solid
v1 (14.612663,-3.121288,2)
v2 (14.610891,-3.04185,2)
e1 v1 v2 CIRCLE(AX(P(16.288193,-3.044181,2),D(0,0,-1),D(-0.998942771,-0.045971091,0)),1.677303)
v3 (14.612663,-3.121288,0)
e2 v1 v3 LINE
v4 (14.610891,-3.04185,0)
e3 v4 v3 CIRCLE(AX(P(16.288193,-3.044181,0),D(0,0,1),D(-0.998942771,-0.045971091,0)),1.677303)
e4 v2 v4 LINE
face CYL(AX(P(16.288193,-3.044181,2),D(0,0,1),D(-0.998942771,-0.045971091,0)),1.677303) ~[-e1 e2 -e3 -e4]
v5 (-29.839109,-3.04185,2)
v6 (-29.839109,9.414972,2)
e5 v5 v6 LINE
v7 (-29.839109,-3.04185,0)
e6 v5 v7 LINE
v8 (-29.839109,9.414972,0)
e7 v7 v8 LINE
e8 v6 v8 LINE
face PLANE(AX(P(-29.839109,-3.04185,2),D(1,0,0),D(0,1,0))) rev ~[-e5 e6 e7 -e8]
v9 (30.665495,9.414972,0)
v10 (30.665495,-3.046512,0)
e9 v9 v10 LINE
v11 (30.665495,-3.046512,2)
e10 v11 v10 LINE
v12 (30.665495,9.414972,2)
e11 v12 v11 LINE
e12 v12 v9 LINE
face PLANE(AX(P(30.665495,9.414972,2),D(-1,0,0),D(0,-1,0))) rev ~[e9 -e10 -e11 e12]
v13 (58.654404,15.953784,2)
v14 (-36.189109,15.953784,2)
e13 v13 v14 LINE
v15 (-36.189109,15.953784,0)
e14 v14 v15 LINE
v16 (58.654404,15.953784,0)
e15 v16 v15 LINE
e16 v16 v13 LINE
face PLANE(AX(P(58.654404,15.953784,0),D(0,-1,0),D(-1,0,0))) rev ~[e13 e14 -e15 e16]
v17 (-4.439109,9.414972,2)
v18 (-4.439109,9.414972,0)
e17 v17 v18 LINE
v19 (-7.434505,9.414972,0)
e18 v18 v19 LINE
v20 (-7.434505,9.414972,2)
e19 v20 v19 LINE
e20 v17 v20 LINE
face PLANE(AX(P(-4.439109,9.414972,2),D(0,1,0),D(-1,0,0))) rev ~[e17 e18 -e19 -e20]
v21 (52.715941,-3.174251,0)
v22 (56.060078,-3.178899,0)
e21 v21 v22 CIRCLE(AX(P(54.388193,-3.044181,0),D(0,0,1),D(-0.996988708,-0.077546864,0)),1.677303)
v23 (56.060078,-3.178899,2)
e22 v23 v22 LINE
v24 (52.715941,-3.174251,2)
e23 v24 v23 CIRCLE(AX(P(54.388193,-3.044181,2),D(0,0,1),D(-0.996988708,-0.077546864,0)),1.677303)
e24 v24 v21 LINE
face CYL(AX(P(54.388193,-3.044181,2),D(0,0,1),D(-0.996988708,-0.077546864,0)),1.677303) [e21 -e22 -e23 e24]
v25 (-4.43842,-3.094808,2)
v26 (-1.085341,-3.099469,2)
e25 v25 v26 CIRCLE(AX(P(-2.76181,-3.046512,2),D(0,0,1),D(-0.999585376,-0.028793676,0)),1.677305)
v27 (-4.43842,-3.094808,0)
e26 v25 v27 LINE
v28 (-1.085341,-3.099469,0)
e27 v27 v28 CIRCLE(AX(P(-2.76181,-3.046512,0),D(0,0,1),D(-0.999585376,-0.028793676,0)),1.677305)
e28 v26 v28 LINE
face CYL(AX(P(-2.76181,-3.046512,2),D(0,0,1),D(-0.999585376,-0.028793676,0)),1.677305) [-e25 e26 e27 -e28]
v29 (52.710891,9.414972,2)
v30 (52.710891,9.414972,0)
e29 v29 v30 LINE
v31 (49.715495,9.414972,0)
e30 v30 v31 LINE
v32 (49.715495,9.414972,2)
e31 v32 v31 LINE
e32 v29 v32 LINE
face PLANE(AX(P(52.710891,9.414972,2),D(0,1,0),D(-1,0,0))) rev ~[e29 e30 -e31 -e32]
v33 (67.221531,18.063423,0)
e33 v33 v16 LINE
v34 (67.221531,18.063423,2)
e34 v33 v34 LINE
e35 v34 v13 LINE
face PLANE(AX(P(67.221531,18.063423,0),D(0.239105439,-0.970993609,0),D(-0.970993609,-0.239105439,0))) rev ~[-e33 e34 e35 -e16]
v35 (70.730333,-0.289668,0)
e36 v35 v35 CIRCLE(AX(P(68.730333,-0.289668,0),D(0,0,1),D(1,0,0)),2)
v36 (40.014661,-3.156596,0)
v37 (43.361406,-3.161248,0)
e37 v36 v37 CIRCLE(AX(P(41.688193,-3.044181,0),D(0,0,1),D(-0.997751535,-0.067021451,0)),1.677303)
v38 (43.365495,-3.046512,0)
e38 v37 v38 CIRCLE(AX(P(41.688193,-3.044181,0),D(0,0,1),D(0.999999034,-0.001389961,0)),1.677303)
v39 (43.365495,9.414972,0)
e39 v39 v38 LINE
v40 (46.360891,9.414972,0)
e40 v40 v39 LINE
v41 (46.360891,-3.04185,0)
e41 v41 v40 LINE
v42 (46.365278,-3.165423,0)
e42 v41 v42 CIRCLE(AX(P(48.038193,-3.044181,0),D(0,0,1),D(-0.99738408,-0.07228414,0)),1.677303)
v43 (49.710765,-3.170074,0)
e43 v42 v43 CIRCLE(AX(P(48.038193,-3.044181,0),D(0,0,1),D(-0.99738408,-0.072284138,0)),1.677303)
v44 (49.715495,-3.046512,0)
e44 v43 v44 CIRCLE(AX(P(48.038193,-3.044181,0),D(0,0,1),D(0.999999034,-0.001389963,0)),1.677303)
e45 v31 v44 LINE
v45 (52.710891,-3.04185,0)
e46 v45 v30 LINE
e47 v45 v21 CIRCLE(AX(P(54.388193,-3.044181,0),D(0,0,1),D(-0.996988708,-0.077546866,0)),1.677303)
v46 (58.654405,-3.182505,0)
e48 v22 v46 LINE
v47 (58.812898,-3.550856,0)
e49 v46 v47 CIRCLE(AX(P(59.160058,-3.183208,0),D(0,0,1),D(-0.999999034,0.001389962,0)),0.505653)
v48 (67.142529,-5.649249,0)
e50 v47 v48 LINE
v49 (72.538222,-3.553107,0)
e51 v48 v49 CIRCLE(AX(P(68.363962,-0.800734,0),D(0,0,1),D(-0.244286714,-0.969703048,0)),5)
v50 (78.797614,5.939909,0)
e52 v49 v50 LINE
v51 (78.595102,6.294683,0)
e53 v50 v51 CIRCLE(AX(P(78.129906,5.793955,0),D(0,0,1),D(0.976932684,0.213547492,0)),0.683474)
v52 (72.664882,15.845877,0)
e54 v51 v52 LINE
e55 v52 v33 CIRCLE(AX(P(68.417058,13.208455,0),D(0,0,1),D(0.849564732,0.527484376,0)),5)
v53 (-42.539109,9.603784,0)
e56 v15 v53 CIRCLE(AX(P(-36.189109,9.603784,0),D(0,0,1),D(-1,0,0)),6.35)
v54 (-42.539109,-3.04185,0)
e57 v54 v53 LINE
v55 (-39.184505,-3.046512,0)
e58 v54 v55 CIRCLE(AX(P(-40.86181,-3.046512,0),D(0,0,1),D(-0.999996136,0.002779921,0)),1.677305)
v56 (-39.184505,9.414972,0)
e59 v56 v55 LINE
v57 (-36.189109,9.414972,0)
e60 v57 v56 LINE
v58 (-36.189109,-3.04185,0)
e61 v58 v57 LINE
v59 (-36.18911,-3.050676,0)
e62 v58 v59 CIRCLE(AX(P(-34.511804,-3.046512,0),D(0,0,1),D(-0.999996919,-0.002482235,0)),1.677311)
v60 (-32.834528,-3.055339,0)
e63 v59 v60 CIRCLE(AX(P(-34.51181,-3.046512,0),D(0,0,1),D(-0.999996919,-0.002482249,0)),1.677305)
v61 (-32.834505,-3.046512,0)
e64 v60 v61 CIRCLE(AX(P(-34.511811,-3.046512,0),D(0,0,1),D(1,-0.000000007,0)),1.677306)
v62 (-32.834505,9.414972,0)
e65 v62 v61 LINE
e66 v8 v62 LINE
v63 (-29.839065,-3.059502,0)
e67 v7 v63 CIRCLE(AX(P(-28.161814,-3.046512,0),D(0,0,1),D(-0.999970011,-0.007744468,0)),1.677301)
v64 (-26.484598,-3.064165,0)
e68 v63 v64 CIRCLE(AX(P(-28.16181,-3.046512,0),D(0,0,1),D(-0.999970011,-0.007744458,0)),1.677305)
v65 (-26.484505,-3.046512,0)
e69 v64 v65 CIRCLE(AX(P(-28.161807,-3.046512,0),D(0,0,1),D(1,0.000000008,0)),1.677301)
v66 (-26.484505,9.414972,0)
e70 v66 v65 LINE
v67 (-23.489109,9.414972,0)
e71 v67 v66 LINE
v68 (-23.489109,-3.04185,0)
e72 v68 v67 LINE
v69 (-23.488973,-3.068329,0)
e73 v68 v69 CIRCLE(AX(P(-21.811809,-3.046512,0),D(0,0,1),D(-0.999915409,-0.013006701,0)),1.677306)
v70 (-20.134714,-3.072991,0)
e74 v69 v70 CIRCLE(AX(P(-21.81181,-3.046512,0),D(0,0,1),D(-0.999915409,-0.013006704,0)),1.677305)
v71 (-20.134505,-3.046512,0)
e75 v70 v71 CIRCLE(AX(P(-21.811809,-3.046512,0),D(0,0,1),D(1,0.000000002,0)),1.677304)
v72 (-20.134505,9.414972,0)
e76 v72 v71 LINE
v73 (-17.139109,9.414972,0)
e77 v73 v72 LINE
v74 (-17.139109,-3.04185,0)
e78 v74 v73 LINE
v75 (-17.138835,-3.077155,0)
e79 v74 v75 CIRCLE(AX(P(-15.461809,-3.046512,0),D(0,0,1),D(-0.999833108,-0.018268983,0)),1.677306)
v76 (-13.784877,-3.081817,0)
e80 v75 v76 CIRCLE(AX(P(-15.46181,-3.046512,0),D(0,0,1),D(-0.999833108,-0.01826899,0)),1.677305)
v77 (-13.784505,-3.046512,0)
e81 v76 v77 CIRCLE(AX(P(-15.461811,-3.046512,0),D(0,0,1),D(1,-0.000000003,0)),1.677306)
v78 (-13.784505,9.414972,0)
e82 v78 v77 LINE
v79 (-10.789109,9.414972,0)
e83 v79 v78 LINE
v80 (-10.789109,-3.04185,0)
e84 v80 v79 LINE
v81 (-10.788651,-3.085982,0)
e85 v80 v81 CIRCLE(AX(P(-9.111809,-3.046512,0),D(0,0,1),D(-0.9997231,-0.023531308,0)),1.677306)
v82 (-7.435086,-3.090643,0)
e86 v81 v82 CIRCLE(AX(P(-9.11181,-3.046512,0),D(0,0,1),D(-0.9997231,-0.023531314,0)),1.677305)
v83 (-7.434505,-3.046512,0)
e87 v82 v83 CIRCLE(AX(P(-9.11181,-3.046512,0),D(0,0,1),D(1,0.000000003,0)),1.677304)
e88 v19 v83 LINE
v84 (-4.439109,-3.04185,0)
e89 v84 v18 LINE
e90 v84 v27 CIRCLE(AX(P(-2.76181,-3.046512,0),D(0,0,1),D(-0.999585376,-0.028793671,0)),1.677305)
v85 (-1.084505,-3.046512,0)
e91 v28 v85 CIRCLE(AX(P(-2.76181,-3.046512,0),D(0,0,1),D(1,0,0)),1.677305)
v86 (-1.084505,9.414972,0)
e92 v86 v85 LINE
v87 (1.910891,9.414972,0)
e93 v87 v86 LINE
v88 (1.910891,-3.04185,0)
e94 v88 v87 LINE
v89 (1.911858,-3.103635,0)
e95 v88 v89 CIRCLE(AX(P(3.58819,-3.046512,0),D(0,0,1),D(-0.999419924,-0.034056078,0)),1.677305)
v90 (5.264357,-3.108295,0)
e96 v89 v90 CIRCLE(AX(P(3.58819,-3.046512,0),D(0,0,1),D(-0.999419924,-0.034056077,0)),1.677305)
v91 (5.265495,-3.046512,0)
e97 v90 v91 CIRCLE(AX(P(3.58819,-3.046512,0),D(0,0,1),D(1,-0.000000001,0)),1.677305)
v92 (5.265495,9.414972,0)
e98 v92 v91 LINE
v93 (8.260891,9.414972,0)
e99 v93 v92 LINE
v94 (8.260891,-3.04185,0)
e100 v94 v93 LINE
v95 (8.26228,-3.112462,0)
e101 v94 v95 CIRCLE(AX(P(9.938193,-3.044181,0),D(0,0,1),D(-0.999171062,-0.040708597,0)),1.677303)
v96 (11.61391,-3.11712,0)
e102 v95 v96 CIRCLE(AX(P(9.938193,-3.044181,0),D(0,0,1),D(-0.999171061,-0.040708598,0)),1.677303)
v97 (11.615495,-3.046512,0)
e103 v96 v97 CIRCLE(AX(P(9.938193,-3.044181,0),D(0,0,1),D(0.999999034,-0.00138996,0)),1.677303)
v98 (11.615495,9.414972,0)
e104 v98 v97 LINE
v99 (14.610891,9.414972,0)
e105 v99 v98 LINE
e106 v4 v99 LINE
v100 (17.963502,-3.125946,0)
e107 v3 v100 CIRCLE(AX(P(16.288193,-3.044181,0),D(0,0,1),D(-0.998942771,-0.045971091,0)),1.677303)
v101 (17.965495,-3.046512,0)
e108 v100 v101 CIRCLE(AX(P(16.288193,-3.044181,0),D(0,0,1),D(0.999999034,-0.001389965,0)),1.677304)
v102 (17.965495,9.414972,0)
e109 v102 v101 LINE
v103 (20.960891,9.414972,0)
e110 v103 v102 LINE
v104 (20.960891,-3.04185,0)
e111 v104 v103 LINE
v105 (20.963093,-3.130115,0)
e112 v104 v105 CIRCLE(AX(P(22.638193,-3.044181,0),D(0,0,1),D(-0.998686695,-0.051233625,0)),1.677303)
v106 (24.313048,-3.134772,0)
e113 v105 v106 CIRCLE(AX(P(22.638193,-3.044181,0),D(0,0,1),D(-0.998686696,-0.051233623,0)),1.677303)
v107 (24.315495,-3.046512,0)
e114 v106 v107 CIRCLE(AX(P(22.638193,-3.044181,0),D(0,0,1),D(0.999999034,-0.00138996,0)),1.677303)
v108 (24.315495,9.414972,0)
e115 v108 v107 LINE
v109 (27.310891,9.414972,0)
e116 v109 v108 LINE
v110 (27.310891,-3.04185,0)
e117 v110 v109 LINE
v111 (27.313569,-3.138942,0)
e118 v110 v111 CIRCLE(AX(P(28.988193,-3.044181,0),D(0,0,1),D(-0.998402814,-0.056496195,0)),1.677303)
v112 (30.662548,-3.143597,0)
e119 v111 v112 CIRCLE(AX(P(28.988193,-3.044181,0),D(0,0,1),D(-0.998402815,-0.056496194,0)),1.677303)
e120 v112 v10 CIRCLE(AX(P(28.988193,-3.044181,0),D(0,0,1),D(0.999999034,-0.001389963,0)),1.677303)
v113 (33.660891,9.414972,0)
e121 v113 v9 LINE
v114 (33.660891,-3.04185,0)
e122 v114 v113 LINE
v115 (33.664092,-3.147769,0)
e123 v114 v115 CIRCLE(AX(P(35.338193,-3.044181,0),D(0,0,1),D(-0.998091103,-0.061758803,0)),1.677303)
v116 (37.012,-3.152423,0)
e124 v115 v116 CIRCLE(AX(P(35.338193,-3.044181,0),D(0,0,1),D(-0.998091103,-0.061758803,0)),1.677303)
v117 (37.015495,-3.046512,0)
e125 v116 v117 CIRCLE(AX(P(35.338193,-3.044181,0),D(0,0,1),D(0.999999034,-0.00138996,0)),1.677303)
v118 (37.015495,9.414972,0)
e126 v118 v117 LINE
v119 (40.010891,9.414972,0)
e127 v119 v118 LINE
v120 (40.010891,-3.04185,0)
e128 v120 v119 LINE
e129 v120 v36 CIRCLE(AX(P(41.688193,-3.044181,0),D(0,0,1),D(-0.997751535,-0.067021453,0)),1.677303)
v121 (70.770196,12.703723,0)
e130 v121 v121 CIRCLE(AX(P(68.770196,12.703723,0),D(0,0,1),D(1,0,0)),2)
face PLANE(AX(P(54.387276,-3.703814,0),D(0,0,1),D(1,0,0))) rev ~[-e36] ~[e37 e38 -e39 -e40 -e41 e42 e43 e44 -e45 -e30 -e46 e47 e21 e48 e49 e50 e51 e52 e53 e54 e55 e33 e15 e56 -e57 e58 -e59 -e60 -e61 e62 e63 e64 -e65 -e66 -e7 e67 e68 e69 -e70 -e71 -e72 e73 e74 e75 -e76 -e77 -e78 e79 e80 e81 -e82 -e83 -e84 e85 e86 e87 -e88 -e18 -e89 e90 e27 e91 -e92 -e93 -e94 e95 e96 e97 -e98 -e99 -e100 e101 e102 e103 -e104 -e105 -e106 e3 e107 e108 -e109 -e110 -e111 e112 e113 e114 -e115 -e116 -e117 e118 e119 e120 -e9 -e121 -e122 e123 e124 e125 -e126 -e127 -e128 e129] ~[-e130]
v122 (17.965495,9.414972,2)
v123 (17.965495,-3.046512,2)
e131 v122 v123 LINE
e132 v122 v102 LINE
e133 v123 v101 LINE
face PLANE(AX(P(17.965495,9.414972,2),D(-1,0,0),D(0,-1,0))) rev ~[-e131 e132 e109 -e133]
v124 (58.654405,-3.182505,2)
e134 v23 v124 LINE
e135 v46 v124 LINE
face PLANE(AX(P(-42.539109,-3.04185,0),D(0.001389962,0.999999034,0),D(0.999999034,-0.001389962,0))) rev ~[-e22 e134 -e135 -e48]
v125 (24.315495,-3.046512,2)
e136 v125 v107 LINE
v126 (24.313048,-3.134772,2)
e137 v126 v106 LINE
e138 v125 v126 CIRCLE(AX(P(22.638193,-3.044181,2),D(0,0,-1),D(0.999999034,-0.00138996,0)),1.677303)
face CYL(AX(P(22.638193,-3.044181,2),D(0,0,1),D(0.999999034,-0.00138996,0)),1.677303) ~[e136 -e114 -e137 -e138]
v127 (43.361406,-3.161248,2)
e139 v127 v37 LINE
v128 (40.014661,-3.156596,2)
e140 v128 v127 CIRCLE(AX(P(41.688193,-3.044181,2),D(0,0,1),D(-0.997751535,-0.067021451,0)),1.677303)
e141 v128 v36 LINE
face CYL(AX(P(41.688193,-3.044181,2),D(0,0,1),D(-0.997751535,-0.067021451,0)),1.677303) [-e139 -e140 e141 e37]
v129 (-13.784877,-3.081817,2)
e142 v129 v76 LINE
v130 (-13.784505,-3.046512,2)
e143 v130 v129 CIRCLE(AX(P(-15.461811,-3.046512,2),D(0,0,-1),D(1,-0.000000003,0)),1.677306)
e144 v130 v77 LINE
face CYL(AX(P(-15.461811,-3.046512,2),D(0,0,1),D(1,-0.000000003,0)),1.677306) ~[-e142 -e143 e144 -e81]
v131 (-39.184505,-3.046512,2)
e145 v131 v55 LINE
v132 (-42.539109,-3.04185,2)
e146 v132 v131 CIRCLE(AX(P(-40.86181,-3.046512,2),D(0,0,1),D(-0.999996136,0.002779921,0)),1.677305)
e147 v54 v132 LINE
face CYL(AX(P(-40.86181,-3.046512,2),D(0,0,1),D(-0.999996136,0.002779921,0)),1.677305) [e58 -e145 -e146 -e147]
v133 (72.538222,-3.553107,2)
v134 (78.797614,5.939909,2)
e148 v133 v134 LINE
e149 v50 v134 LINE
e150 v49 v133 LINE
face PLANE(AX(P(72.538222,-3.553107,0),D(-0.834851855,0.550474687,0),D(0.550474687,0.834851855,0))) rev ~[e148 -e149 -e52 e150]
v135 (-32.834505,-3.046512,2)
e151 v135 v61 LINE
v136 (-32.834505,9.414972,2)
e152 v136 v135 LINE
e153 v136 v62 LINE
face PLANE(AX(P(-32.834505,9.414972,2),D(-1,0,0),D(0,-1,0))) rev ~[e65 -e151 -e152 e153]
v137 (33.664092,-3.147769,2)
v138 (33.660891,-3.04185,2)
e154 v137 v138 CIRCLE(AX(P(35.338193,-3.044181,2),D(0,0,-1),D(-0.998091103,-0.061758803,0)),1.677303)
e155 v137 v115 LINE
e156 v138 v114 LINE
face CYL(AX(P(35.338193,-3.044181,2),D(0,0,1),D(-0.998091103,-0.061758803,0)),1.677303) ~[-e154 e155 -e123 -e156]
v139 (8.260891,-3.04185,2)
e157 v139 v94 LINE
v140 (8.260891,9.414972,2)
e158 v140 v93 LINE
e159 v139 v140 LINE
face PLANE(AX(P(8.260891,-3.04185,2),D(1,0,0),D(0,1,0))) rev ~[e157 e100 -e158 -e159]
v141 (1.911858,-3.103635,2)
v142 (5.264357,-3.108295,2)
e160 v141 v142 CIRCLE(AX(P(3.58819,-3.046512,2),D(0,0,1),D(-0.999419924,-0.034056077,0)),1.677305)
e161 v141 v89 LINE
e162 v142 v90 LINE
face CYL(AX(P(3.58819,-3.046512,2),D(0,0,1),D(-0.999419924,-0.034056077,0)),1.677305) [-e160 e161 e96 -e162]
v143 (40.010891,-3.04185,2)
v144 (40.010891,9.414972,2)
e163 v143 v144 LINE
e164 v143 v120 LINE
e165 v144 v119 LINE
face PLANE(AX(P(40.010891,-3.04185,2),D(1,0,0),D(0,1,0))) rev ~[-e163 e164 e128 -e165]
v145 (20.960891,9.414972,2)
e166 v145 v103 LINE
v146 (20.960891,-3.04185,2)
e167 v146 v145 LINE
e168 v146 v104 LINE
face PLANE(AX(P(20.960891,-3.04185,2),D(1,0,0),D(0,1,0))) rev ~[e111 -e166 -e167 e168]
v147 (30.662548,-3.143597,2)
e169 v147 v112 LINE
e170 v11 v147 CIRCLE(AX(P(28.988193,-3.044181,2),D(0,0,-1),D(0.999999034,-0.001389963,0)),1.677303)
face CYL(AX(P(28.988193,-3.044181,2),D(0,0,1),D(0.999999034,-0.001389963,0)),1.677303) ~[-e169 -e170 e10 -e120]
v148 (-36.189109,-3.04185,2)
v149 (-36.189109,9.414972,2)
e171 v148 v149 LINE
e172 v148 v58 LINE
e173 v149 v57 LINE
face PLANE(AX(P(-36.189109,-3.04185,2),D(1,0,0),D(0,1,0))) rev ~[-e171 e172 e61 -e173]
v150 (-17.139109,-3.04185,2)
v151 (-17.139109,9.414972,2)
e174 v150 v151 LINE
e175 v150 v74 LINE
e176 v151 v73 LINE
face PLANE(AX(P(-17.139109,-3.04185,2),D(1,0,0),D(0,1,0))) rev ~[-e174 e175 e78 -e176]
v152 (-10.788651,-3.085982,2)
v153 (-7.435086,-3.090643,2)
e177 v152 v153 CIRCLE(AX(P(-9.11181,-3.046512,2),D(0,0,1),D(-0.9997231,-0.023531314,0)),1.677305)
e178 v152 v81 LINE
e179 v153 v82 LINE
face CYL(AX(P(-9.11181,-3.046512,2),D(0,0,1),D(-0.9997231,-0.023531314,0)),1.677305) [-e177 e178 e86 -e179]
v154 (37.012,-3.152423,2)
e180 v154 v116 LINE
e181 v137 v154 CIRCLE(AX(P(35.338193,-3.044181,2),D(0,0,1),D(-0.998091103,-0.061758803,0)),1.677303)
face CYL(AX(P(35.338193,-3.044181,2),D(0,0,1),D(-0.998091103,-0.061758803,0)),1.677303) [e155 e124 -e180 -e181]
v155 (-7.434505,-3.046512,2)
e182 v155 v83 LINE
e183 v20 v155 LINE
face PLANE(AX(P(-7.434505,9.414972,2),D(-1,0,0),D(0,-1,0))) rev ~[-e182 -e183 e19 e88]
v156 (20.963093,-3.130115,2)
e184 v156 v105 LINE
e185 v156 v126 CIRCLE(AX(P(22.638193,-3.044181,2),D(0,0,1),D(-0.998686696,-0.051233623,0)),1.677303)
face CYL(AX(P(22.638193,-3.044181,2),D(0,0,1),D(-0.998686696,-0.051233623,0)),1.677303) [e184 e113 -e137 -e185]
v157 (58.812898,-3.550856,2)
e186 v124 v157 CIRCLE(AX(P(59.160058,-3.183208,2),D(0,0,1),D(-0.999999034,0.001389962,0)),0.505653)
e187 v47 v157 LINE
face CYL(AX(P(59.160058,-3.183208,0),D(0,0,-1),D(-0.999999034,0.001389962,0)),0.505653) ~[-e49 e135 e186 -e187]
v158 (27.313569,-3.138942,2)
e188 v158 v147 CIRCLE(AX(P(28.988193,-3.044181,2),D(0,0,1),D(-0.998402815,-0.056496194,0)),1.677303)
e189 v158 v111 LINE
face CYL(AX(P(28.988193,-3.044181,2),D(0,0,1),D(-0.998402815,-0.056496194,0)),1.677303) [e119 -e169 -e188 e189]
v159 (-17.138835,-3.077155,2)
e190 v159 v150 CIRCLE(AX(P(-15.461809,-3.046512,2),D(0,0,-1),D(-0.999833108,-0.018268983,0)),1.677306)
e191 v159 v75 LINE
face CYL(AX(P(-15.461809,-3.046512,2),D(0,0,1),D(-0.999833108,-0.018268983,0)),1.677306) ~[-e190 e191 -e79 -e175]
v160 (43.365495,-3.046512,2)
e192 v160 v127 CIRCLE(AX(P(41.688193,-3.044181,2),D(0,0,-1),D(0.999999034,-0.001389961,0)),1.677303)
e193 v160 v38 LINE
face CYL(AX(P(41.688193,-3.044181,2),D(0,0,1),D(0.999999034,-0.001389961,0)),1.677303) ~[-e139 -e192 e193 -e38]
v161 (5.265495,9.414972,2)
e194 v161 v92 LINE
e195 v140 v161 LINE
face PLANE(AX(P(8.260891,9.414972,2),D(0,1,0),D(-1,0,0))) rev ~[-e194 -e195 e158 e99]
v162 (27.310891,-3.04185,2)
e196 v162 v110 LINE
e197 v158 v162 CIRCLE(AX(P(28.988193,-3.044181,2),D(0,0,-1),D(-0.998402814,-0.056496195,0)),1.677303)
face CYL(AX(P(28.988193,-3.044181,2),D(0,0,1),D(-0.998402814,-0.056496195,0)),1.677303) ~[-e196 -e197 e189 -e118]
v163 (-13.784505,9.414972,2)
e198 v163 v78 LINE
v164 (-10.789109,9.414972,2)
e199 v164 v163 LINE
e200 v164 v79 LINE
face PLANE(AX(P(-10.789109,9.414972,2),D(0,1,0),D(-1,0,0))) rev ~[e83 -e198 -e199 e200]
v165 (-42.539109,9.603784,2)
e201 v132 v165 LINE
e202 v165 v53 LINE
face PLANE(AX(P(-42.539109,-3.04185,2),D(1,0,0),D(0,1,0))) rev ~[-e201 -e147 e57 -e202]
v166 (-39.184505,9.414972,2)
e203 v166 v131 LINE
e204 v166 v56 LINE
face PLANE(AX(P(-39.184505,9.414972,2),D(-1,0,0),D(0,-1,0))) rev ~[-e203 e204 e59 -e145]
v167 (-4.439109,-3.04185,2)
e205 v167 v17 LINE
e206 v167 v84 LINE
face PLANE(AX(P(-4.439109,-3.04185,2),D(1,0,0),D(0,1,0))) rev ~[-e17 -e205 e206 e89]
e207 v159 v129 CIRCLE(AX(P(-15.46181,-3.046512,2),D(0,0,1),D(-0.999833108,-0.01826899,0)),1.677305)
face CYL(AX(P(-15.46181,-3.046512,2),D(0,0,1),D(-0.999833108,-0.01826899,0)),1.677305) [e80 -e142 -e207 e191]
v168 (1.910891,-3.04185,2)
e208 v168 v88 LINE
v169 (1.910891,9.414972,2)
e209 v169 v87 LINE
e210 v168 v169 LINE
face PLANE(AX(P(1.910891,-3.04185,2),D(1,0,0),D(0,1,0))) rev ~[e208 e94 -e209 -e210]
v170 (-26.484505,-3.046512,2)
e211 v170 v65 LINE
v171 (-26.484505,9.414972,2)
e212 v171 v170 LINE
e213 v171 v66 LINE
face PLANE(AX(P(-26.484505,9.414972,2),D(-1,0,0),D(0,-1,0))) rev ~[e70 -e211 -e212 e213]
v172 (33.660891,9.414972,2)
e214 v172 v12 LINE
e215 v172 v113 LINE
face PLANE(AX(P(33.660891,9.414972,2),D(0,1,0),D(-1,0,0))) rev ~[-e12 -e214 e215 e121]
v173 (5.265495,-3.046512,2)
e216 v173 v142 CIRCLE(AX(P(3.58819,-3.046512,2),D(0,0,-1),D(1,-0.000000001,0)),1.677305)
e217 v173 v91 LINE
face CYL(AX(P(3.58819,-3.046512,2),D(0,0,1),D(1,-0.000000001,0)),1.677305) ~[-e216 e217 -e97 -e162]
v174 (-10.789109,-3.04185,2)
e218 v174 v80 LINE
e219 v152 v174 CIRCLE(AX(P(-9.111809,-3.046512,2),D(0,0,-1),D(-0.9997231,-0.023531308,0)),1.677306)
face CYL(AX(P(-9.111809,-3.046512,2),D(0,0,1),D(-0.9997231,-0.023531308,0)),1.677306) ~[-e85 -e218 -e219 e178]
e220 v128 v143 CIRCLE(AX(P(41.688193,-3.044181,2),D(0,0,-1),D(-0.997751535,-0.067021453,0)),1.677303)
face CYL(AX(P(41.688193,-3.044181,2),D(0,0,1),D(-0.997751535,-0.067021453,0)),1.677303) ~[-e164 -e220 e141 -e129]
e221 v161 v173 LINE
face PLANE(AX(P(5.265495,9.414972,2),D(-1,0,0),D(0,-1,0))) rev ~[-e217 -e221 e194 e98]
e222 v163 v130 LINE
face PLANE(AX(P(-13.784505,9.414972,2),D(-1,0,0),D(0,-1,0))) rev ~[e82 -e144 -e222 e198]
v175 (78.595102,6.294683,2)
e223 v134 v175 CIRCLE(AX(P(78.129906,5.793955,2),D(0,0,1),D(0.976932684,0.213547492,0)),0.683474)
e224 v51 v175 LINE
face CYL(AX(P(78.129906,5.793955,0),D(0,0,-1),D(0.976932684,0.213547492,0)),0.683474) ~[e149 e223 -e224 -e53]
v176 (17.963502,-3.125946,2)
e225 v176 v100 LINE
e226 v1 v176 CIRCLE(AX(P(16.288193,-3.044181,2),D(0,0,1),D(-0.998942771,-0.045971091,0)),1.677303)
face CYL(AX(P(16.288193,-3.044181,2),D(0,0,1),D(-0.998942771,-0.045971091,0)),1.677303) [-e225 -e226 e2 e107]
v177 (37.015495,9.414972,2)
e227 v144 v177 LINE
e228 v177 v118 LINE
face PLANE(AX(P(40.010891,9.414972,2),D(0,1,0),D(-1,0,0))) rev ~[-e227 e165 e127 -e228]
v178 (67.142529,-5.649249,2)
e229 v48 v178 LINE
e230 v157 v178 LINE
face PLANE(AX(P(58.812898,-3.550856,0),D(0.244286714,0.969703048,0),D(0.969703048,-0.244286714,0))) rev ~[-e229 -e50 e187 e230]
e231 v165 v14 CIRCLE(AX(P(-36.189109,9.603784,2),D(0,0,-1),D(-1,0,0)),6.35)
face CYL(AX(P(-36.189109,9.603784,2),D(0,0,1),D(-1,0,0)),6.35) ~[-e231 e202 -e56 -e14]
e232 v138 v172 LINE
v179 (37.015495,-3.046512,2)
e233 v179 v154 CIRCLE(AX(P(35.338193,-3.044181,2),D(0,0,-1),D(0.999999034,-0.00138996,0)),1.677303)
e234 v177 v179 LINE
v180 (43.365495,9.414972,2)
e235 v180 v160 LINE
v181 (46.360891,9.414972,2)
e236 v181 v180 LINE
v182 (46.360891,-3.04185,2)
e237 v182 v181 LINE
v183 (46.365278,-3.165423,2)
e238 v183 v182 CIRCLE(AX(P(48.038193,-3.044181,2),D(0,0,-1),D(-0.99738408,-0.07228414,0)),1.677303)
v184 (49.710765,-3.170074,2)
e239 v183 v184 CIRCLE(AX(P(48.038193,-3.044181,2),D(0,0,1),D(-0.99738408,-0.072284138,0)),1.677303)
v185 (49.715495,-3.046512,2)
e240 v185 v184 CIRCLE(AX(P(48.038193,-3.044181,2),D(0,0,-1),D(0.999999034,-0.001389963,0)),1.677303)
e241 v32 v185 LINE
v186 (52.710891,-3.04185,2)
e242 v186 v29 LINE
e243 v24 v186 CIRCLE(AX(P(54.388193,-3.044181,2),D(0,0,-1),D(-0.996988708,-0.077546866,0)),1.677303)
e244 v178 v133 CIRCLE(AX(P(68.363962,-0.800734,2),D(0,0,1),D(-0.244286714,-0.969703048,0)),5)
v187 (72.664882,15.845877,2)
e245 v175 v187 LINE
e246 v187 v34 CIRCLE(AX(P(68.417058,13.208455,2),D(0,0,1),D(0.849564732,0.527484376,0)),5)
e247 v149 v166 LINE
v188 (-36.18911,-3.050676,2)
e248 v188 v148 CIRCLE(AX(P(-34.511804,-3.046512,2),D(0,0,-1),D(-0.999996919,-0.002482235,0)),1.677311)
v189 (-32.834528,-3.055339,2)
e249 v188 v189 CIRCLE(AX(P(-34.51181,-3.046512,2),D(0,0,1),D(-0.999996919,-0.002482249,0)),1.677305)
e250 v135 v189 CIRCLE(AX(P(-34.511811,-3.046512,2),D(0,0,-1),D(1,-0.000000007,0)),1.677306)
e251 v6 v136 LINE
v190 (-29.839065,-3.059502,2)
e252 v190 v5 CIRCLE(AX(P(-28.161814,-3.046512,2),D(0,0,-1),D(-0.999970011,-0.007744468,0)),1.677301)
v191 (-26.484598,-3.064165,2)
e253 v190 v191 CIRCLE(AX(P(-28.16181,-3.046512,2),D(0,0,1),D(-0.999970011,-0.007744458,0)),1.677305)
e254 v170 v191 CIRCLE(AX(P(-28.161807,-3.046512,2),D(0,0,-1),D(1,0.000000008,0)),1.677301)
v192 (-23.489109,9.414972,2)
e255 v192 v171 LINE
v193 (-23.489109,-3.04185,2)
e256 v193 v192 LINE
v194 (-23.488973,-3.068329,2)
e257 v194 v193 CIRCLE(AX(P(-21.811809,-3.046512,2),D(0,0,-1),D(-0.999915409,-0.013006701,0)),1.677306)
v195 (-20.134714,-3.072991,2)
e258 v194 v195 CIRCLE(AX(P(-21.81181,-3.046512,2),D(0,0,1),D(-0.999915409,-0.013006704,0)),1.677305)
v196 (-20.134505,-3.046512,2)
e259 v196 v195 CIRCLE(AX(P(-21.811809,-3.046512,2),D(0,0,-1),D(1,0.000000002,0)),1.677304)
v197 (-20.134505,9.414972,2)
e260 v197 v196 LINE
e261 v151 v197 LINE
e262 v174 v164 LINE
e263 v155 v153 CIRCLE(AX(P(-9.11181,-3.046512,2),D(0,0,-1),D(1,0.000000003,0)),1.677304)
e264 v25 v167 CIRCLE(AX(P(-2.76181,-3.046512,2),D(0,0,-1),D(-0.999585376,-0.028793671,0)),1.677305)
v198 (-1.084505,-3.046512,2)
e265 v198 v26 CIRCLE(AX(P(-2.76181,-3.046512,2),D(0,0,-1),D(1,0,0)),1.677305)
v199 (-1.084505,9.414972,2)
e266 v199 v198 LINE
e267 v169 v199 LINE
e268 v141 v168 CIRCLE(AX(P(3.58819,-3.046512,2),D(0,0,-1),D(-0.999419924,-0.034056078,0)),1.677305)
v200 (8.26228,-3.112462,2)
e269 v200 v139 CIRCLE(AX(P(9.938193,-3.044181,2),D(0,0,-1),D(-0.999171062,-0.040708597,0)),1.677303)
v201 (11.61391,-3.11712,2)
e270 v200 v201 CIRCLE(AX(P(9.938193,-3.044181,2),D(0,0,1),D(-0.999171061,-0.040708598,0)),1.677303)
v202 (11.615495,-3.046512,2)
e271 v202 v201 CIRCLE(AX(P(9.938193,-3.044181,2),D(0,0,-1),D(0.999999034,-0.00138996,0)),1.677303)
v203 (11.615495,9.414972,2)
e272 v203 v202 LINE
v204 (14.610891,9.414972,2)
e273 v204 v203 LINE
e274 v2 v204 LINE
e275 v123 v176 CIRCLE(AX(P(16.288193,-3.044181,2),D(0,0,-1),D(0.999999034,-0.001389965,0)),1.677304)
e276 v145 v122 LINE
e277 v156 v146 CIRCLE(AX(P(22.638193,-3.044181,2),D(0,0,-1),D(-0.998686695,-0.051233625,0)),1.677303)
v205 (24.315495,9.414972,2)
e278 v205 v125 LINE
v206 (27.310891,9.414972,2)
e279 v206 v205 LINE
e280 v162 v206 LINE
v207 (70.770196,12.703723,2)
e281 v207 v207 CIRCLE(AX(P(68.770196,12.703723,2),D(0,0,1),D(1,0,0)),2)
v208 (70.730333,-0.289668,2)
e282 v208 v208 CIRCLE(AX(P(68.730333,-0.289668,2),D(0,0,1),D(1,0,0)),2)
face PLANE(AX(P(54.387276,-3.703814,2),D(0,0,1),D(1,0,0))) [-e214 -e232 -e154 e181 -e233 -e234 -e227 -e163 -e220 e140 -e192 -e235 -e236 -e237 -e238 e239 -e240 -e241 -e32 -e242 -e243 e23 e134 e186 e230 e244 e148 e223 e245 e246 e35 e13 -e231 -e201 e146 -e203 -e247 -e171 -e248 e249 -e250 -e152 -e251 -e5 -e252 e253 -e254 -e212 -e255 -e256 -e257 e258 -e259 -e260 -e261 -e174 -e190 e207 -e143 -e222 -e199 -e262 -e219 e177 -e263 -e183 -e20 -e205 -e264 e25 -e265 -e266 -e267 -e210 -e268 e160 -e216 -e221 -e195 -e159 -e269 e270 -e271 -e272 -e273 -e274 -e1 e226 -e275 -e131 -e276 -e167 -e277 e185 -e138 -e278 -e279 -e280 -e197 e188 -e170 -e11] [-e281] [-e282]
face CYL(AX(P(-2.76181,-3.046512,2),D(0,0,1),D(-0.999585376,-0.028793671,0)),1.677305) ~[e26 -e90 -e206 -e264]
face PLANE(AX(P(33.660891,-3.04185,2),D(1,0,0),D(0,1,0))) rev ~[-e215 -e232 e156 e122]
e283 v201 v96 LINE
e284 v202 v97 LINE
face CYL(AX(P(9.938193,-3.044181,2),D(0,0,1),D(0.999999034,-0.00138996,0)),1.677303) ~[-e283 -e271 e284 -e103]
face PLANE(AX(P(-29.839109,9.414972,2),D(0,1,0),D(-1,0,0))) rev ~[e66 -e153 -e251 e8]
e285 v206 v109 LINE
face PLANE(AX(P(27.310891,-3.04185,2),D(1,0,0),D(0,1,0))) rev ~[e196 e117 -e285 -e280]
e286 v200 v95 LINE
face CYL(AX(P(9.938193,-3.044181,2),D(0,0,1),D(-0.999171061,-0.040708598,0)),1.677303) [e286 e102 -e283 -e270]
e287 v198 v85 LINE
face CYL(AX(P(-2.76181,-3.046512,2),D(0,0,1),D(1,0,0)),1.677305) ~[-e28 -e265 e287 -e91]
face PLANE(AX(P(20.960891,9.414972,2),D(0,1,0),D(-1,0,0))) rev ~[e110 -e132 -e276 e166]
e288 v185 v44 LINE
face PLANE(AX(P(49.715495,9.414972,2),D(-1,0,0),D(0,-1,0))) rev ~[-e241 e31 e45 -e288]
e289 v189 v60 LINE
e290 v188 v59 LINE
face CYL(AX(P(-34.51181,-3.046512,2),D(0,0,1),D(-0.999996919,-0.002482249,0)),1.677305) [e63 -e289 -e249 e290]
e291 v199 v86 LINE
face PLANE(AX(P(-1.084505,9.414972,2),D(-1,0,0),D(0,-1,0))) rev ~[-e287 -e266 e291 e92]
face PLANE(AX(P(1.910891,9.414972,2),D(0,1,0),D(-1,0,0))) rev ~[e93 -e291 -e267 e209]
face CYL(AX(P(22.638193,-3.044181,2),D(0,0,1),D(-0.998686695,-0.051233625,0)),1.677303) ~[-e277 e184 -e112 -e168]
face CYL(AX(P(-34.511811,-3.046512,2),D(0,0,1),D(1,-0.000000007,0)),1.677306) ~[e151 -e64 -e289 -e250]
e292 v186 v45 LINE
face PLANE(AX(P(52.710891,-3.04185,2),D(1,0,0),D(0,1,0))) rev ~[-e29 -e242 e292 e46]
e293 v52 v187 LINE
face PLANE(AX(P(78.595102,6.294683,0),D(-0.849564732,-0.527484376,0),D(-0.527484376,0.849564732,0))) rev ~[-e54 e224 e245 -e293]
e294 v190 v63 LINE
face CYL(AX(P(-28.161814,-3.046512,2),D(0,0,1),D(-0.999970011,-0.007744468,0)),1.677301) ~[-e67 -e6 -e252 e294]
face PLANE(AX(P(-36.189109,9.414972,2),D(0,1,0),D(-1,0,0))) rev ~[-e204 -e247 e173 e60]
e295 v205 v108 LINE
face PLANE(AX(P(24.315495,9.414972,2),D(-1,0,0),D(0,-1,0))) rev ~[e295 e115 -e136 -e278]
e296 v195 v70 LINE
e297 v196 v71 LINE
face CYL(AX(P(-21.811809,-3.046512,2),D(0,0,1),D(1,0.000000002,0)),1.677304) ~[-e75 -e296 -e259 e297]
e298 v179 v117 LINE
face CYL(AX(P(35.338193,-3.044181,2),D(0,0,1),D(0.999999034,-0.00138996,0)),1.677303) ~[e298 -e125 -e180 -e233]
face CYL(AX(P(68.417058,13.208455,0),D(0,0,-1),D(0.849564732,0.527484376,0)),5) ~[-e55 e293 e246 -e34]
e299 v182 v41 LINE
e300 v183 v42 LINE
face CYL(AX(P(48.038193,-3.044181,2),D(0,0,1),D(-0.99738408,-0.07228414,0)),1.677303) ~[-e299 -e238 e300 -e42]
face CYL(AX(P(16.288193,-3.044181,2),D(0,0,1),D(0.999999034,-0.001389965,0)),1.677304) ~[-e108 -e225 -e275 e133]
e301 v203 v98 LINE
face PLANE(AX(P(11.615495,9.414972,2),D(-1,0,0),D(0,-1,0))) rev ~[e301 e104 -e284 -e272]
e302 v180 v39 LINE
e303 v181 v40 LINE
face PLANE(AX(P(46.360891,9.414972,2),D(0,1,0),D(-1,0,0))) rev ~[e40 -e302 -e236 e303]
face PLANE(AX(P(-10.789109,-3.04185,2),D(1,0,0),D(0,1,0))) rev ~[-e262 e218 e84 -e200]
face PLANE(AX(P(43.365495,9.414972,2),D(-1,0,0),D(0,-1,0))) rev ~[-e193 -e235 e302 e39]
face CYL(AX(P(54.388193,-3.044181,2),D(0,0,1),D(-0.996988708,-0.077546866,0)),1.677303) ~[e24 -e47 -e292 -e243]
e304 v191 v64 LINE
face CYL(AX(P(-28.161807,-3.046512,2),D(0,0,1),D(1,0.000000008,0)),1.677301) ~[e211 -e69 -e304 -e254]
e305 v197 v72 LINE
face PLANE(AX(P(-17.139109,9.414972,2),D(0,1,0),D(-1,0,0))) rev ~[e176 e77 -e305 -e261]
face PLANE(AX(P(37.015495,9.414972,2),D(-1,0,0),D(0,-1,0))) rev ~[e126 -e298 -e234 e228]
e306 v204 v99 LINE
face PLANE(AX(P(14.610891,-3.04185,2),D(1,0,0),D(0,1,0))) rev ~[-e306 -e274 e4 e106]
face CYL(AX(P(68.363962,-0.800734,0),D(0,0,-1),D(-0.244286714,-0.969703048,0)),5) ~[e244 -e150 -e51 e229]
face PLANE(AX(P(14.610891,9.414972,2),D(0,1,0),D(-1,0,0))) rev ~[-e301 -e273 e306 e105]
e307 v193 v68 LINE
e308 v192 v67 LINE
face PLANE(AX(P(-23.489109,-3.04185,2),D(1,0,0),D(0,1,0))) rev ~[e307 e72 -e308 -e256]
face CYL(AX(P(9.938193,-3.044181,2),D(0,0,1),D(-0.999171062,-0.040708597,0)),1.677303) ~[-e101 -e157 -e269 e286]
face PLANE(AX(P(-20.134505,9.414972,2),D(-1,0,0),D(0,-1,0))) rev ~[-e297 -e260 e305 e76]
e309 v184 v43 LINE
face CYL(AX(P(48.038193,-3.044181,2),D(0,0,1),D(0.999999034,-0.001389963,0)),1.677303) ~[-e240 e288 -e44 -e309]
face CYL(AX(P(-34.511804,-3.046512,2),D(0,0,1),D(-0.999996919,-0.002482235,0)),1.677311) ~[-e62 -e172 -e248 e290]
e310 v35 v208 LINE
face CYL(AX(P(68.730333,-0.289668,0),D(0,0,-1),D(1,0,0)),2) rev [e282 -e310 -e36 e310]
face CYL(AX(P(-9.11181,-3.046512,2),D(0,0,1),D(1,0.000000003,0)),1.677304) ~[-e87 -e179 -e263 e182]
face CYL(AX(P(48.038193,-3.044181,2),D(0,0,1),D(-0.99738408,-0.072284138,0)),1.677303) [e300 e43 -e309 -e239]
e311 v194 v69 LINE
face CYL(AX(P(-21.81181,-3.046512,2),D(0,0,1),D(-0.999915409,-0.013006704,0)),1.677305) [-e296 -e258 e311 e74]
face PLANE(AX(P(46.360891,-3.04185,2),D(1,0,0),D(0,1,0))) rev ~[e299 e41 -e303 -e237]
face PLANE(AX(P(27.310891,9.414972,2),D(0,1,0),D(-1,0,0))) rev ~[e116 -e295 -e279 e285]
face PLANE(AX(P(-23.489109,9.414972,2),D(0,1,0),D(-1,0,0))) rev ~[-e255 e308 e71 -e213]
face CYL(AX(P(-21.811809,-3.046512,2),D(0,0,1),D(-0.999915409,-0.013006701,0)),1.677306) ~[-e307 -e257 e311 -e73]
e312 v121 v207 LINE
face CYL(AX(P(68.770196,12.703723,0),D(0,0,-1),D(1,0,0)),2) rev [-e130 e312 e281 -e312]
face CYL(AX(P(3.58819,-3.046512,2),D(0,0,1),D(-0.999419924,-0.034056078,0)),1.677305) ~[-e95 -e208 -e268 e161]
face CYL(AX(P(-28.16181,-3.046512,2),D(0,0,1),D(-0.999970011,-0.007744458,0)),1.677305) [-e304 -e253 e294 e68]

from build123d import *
from build123d import SkipClean  # not in build123d's __all__

# Parameters (mm, degrees)
F0_R     = 2
F1_DEPTH = 2
F3_DEPTH = 25.4
F4_DEPTH = 2
F5_DEPTH = 25.4


# Not quite as in the source:
# - a feature names something its author has since deleted; it is built from what else it names


with BuildPart() as f1:
    # F0 (on Top) → F1 (new body)
    with BuildSketch(Plane.XY):
        with BuildLine():
            ThreePointArc((-44.4982377637, 15.9537835574), (-46.6435438514, 15.0651686804), (-47.5321587284, 12.9198625927))
            Line((-47.5321587284, 12.9198625927), (-47.5321587284, 1.9581455603))
            ThreePointArc((-47.5321587284, 1.9581455603), (-46.0701489095, -1.5749303628), (-42.539108537, -3.0418496097))
            Line((-42.539108537, -3.0418496097), (58.6544047029, -3.182504855))
            ThreePointArc((58.6544047029, -3.182504855), (58.695576092, -3.383063352), (58.8128977225, -3.5508561677))
            Line((58.8128977225, -3.5508561677), (67.1425286707, -5.6492492557))
            ThreePointArc((67.1425286707, -5.6492492557), (70.1745553832, -5.4613941054), (72.5382215144, -3.553107449))
            Line((72.5382215144, -3.553107449), (78.7976136626, 5.9399087982))
            ThreePointArc((78.7976136626, 5.9399087982), (78.7234830832, 6.1327797263), (78.5951017421, 6.2946833056))
            Line((78.5951017421, 6.2946833056), (72.6648820615, 15.8458770867))
            ThreePointArc((72.6648820615, 15.8458770867), (70.3034587252, 17.8389512741), (67.2215312081, 18.0634232527))
            Line((67.2215312081, 18.0634232527), (58.6544042144, 15.9537835574))
            Line((58.6544042144, 15.9537835574), (-44.4982377637, 15.9537835574))
        make_face()
        with Locations((68.7303330245, -0.2896678891)):
            Circle(F0_R, mode=Mode.SUBTRACT)
        with Locations((68.7701961271, 12.7037232041)):
            Circle(F0_R, mode=Mode.SUBTRACT)
    extrude(amount=F1_DEPTH)

    # F2 (on face) → F3 (cut)
    with BuildSketch(Plane.XY.offset(2)):
        with BuildLine():
            Line((-10.789108537, 9.4149718061), (-13.784505137, 9.4149718061))
            Line((-13.784505137, 9.4149718061), (-13.784505137, -3.0465123845))
            ThreePointArc((-13.784505137, -3.0465123845), (-13.7845980378, -3.0641656349), (-13.7848767298, -3.0818169297))
            Line((-13.7848767298, -3.0818169297), (-10.7886505729, -3.0859815734))
            ThreePointArc((-10.7886505729, -3.0859815734), (-10.7890247148, -3.0639170979), (-10.789108537, -3.0418496097))
            Line((-10.789108537, -3.0418496097), (-10.789108537, 9.4149718061))
        make_face()
        with BuildLine():
            Line((-4.439108537, 9.4149718061), (-7.434505137, 9.4149718061))
            Line((-7.434505137, 9.4149718061), (-7.434505137, -3.0465123845))
            ThreePointArc((-7.434505137, -3.0465123845), (-7.4346503047, -3.0685795544), (-7.4350857828, -3.0906429046))
            Line((-7.4350857828, -3.0906429046), (-4.4384195675, -3.0948081599))
            ThreePointArc((-4.4384195675, -3.0948081599), (-4.4389730944, -3.0683316044), (-4.439108537, -3.0418496097))
            Line((-4.439108537, -3.0418496097), (-4.439108537, 9.4149718061))
        make_face()
        with BuildLine():
            Line((1.910891463, 9.4149718061), (-1.084505137, 9.4149718061))
            Line((-1.084505137, 9.4149718061), (-1.084505137, -3.0465123845))
            ThreePointArc((-1.084505137, -3.0465123845), (-1.0847141969, -3.0729939003), (-1.0853413245, -3.0994688148))
            Line((-1.0853413245, -3.0994688148), (1.911857947, -3.1036348111))
            ThreePointArc((1.911857947, -3.1036348111), (1.9110901561, -3.0727466615), (1.910891463, -3.0418496097))
            Line((1.910891463, -3.0418496097), (1.910891463, 9.4149718061))
        make_face()
        with BuildLine():
            Line((8.260891463, 9.4149718061), (5.265494863, 9.4149718061))
            Line((5.265494863, 9.4149718061), (5.265494863, -3.0465123845))
            ThreePointArc((5.265494863, -3.0465123845), (5.2652102793, -3.0774087645), (5.2643566248, -3.1082946604))
            Line((5.2643566248, -3.1082946604), (8.2622802241, -3.1124616635))
            ThreePointArc((8.2622802241, -3.1124616635), (8.2612141473, -3.0771629469), (8.260891463, -3.0418496097))
            Line((8.260891463, -3.0418496097), (8.260891463, 9.4149718061))
        make_face()
        with BuildLine():
            Line((14.610891463, 9.4149718061), (11.615494863, 9.4149718061))
            Line((11.615494863, 9.4149718061), (11.615494863, -3.0465123845))
            ThreePointArc((11.615494863, -3.0465123845), (11.6150740117, -3.0818246882), (11.6139098113, -3.1171203048))
            Line((11.6139098113, -3.1171203048), (14.6126631372, -3.1212884611))
            ThreePointArc((14.6126631372, -3.1212884611), (14.6113068287, -3.081579528), (14.610891463, -3.0418496097))
            Line((14.610891463, -3.0418496097), (14.610891463, 9.4149718061))
        make_face()
        with BuildLine():
            Line((17.9635023619, -3.1259460039), (20.9630926527, -3.1301153236))
            ThreePointArc((20.9630926527, -3.1301153236), (20.9614111694, -3.0859969529), (20.960891463, -3.0418496097))
            Line((20.960891463, -3.0418496097), (20.960891463, 9.4149718061))
            Line((20.960891463, 9.4149718061), (17.965494863, 9.4149718061))
            Line((17.965494863, 9.4149718061), (17.965494863, -3.0465123845))
            ThreePointArc((17.965494863, -3.0465123845), (17.9649690528, -3.0862409946), (17.9635023619, -3.1259460039))
        make_face()
        with BuildLine():
            Line((24.3130483101, -3.1347716382), (27.3135688072, -3.1389422508))
            ThreePointArc((27.3135688072, -3.1389422508), (27.3115271807, -3.0904153143), (27.310891463, -3.0418496097))
            Line((27.310891463, -3.0418496097), (27.310891463, 9.4149718061))
            Line((27.310891463, 9.4149718061), (24.315494863, 9.4149718061))
            Line((24.315494863, 9.4149718061), (24.315494863, -3.0465123845))
            ThreePointArc((24.315494863, -3.0465123845), (24.3148524325, -3.0906581124), (24.3130483101, -3.1347716382))
        make_face()
        with BuildLine():
            Line((30.6625476193, -3.1435972077), (33.6640916417, -3.147769243))
            ThreePointArc((33.6640916417, -3.147769243), (33.6616548753, -3.0948347051), (33.660891463, -3.0418496097))
            Line((33.660891463, -3.0418496097), (33.660891463, 9.4149718061))
            Line((33.660891463, 9.4149718061), (30.665494863, 9.4149718061))
            Line((30.665494863, 9.4149718061), (30.665494863, -3.0465123845))
            ThreePointArc((30.665494863, -3.0465123845), (30.6647241389, -3.0950761342), (30.6625476193, -3.1435972077))
        make_face()
        with BuildLine():
            Line((37.0120002484, -3.1524227123), (40.014661201, -3.1565963001))
            ThreePointArc((40.014661201, -3.1565963001), (40.011794267, -3.0992552184), (40.010891463, -3.0418496097))
            Line((40.010891463, -3.0418496097), (40.010891463, 9.4149718061))
            Line((40.010891463, 9.4149718061), (37.015494863, 9.4149718061))
            Line((37.015494863, 9.4149718061), (37.015494863, -3.0465123845))
            ThreePointArc((37.015494863, -3.0465123845), (37.0145841593, -3.0994951529), (37.0120002484, -3.1524227123))
        make_face()
        with BuildLine():
            Line((43.3614061528, -3.1612481519), (46.3652775338, -3.1654234222))
            ThreePointArc((46.3652775338, -3.1654234222), (46.361945371, -3.1036769476), (46.360891463, -3.0418496097))
            Line((46.360891463, -3.0418496097), (46.360891463, 9.4149718061))
            Line((46.360891463, 9.4149718061), (43.365494863, 9.4149718061))
            Line((43.365494863, 9.4149718061), (43.365494863, -3.0465123845))
            ThreePointArc((43.365494863, -3.0465123845), (43.3644324794, -3.1039152616), (43.3614061528, -3.1612481519))
        make_face()
        with BuildLine():
            Line((49.7107652838, -3.1700735266), (52.7159406928, -3.1742506094))
            ThreePointArc((52.7159406928, -3.1742506094), (52.7121082036, -3.1080999865), (52.710891463, -3.0418496097))
            Line((52.710891463, -3.0418496097), (52.710891463, 9.4149718061))
            Line((52.710891463, 9.4149718061), (49.715494863, 9.4149718061))
            Line((49.715494863, 9.4149718061), (49.715494863, -3.0465123845))
            ThreePointArc((49.715494863, -3.0465123845), (49.7142690839, -3.1083365537), (49.7107652838, -3.1700735266))
        make_face()
        with BuildLine():
            Line((-17.139108537, 9.4149718061), (-20.134505137, 9.4149718061))
            Line((-20.134505137, 9.4149718061), (-20.134505137, -3.0465123845))
            ThreePointArc((-20.134505137, -3.0465123845), (-20.1345573909, -3.0597520498), (-20.1347141494, -3.0729908903))
            Line((-20.1347141494, -3.0729908903), (-17.1388350895, -3.0771550515))
            ThreePointArc((-17.1388350895, -3.0771550515), (-17.1390647112, -3.0595030501), (-17.139108537, -3.0418496097))
            Line((-17.139108537, -3.0418496097), (-17.139108537, 9.4149718061))
        make_face()
        with BuildLine():
            Line((-23.489108537, 9.4149718061), (-26.484505137, 9.4149718061))
            Line((-26.484505137, 9.4149718061), (-26.484505137, -3.0465123845))
            ThreePointArc((-26.484505137, -3.0465123845), (-26.4845283601, -3.0553387076), (-26.4845980289, -3.0641647862))
            Line((-26.4845980289, -3.0641647862), (-23.4889731336, -3.0683285942))
            ThreePointArc((-23.4889731336, -3.0683285942), (-23.4890930885, -3.0550893691), (-23.489108537, -3.0418496097))
            Line((-23.489108537, -3.0418496097), (-23.489108537, 9.4149718061))
        make_face()
        with BuildLine():
            Line((-29.839108537, 9.4149718061), (-32.834505137, 9.4149718061))
            Line((-32.834505137, 9.4149718061), (-32.834505137, -3.0465123845))
            ThreePointArc((-32.834505137, -3.0465123845), (-32.8345109427, -3.0509255163), (-32.8345283597, -3.0553386176))
            Line((-32.8345283597, -3.0553386176), (-29.8390647178, -3.0595022015))
            ThreePointArc((-29.8390647178, -3.0595022015), (-29.8391098505, -3.0506759632), (-29.839108537, -3.0418496097))
            Line((-29.839108537, -3.0418496097), (-29.839108537, 9.4149718061))
        make_face()
        with BuildLine():
            Line((-36.189108537, 9.4149718061), (-39.184505137, 9.4149718061))
            Line((-39.184505137, 9.4149718061), (-39.184505137, -3.0465123845))
            Line((-39.184505137, -3.0465123845), (-36.1891098507, -3.0506758733))
            ThreePointArc((-36.1891098507, -3.0506758733), (-36.1891149995, -3.0462627406), (-36.189108537, -3.0418496097))
            Line((-36.189108537, -3.0418496097), (-36.189108537, 9.4149718061))
        make_face()
    extrude(amount=-F3_DEPTH, mode=Mode.SUBTRACT)

    # F2 (on face) → F4 (join)
    with BuildSketch(Plane.XY.offset(2)):
        with BuildLine():
            ThreePointArc((52.7159406928, -3.1742506094), (54.3858617756, -4.7214826971), (56.0600775884, -3.1788988362))
            Line((56.0600775884, -3.1788988362), (52.7159406928, -3.1742506094))
        make_face()
        with BuildLine():
            ThreePointArc((46.3652775338, -3.1654234222), (48.0358617756, -4.7214826971), (49.7107652838, -3.1700735266))
            Line((49.7107652838, -3.1700735266), (46.3652775338, -3.1654234222))
        make_face()
        with BuildLine():
            ThreePointArc((40.014661201, -3.1565963001), (41.6858617756, -4.7214826971), (43.3614061528, -3.1612481519))
            Line((43.3614061528, -3.1612481519), (40.014661201, -3.1565963001))
        make_face()
        with BuildLine():
            ThreePointArc((33.6640916417, -3.147769243), (35.3358617756, -4.7214826971), (37.0120002484, -3.1524227123))
            Line((37.0120002484, -3.1524227123), (33.6640916417, -3.147769243))
        make_face()
        with BuildLine():
            ThreePointArc((27.3135688072, -3.1389422508), (28.9858617756, -4.7214826971), (30.6625476193, -3.1435972077))
            Line((30.6625476193, -3.1435972077), (27.3135688072, -3.1389422508))
        make_face()
        with BuildLine():
            ThreePointArc((20.9630926527, -3.1301153236), (22.6358617756, -4.7214826971), (24.3130483101, -3.1347716382))
            Line((24.3130483101, -3.1347716382), (20.9630926527, -3.1301153236))
        make_face()
        with BuildLine():
            Line((17.9635023619, -3.1259460039), (14.6126631372, -3.1212884611))
            ThreePointArc((14.6126631372, -3.1212884611), (16.2858617756, -4.7214826971), (17.9635023619, -3.1259460039))
        make_face()
        with BuildLine():
            Line((11.6139098113, -3.1171203048), (8.2622802241, -3.1124616635))
            ThreePointArc((8.2622802241, -3.1124616635), (9.9358617756, -4.7214826971), (11.6139098113, -3.1171203048))
        make_face()
        with BuildLine():
            Line((5.2643566248, -3.1082946604), (1.911857947, -3.1036348111))
            ThreePointArc((1.911857947, -3.1036348111), (3.5858585328, -4.7238157048), (5.2643566248, -3.1082946604))
        make_face()
        with BuildLine():
            Line((-1.0853413245, -3.0994688148), (-4.4384195675, -3.0948081599))
            ThreePointArc((-4.4384195675, -3.0948081599), (-2.7641414672, -4.7238157048), (-1.0853413245, -3.0994688148))
        make_face()
        with BuildLine():
            Line((-7.4350857828, -3.0906429046), (-10.7886505729, -3.0859815734))
            ThreePointArc((-10.7886505729, -3.0859815734), (-9.1141414672, -4.7238157048), (-7.4350857828, -3.0906429046))
        make_face()
        with BuildLine():
            Line((-13.7848767298, -3.0818169297), (-17.1388350895, -3.0771550515))
            ThreePointArc((-17.1388350895, -3.0771550515), (-15.4641414672, -4.7238157048), (-13.7848767298, -3.0818169297))
        make_face()
        with BuildLine():
            Line((-20.1347141494, -3.0729908903), (-23.4889731336, -3.0683285942))
            ThreePointArc((-23.4889731336, -3.0683285942), (-21.8141414672, -4.7238157048), (-20.1347141494, -3.0729908903))
        make_face()
        with BuildLine():
            Line((-26.4845980289, -3.0641647862), (-29.8390647178, -3.0595022015))
            ThreePointArc((-29.8390647178, -3.0595022015), (-28.1641414672, -4.7238157048), (-26.4845980289, -3.0641647862))
        make_face()
        with BuildLine():
            Line((-32.8345283597, -3.0553386176), (-36.1891098507, -3.0506758733))
            ThreePointArc((-36.1891098507, -3.0506758733), (-34.5141414672, -4.7238157048), (-32.8345283597, -3.0553386176))
        make_face()
        with BuildLine():
            Line((-39.184505137, -3.0465123845), (-42.539108537, -3.0418496097))
            ThreePointArc((-42.539108537, -3.0418496097), (-40.8641414672, -4.7238157048), (-39.184505137, -3.0465123845))
        make_face()
    with SkipClean():  # cleaning this boolean's faces spoils the solid; the shape is the same uncleaned
        extrude(amount=-F4_DEPTH)

    # F2 (on face) → F5 (cut)
    with BuildSketch(Plane.XY.offset(2)):
        with BuildLine():
            ThreePointArc((-42.539108537, 9.6037835574), (-40.6792365975, 14.0939116179), (-36.189108537, 15.9537835574))
            Line((-36.189108537, 15.9537835574), (-44.4982377637, 15.9537835574))
            ThreePointArc((-44.4982377637, 15.9537835574), (-46.6435438514, 15.0651686804), (-47.5321587284, 12.9198625927))
            Line((-47.5321587284, 12.9198625927), (-47.5321587284, 1.9581455603))
            ThreePointArc((-47.5321587284, 1.9581455603), (-46.0701489095, -1.5749303628), (-42.539108537, -3.0418496097))
            Line((-42.539108537, -3.0418496097), (-42.539108537, 9.4149718061))
            Line((-42.539108537, 9.4149718061), (-42.539108537, 9.6037835574))
        make_face()
    extrude(amount=-F5_DEPTH, mode=Mode.SUBTRACT)


solid = f1.part
